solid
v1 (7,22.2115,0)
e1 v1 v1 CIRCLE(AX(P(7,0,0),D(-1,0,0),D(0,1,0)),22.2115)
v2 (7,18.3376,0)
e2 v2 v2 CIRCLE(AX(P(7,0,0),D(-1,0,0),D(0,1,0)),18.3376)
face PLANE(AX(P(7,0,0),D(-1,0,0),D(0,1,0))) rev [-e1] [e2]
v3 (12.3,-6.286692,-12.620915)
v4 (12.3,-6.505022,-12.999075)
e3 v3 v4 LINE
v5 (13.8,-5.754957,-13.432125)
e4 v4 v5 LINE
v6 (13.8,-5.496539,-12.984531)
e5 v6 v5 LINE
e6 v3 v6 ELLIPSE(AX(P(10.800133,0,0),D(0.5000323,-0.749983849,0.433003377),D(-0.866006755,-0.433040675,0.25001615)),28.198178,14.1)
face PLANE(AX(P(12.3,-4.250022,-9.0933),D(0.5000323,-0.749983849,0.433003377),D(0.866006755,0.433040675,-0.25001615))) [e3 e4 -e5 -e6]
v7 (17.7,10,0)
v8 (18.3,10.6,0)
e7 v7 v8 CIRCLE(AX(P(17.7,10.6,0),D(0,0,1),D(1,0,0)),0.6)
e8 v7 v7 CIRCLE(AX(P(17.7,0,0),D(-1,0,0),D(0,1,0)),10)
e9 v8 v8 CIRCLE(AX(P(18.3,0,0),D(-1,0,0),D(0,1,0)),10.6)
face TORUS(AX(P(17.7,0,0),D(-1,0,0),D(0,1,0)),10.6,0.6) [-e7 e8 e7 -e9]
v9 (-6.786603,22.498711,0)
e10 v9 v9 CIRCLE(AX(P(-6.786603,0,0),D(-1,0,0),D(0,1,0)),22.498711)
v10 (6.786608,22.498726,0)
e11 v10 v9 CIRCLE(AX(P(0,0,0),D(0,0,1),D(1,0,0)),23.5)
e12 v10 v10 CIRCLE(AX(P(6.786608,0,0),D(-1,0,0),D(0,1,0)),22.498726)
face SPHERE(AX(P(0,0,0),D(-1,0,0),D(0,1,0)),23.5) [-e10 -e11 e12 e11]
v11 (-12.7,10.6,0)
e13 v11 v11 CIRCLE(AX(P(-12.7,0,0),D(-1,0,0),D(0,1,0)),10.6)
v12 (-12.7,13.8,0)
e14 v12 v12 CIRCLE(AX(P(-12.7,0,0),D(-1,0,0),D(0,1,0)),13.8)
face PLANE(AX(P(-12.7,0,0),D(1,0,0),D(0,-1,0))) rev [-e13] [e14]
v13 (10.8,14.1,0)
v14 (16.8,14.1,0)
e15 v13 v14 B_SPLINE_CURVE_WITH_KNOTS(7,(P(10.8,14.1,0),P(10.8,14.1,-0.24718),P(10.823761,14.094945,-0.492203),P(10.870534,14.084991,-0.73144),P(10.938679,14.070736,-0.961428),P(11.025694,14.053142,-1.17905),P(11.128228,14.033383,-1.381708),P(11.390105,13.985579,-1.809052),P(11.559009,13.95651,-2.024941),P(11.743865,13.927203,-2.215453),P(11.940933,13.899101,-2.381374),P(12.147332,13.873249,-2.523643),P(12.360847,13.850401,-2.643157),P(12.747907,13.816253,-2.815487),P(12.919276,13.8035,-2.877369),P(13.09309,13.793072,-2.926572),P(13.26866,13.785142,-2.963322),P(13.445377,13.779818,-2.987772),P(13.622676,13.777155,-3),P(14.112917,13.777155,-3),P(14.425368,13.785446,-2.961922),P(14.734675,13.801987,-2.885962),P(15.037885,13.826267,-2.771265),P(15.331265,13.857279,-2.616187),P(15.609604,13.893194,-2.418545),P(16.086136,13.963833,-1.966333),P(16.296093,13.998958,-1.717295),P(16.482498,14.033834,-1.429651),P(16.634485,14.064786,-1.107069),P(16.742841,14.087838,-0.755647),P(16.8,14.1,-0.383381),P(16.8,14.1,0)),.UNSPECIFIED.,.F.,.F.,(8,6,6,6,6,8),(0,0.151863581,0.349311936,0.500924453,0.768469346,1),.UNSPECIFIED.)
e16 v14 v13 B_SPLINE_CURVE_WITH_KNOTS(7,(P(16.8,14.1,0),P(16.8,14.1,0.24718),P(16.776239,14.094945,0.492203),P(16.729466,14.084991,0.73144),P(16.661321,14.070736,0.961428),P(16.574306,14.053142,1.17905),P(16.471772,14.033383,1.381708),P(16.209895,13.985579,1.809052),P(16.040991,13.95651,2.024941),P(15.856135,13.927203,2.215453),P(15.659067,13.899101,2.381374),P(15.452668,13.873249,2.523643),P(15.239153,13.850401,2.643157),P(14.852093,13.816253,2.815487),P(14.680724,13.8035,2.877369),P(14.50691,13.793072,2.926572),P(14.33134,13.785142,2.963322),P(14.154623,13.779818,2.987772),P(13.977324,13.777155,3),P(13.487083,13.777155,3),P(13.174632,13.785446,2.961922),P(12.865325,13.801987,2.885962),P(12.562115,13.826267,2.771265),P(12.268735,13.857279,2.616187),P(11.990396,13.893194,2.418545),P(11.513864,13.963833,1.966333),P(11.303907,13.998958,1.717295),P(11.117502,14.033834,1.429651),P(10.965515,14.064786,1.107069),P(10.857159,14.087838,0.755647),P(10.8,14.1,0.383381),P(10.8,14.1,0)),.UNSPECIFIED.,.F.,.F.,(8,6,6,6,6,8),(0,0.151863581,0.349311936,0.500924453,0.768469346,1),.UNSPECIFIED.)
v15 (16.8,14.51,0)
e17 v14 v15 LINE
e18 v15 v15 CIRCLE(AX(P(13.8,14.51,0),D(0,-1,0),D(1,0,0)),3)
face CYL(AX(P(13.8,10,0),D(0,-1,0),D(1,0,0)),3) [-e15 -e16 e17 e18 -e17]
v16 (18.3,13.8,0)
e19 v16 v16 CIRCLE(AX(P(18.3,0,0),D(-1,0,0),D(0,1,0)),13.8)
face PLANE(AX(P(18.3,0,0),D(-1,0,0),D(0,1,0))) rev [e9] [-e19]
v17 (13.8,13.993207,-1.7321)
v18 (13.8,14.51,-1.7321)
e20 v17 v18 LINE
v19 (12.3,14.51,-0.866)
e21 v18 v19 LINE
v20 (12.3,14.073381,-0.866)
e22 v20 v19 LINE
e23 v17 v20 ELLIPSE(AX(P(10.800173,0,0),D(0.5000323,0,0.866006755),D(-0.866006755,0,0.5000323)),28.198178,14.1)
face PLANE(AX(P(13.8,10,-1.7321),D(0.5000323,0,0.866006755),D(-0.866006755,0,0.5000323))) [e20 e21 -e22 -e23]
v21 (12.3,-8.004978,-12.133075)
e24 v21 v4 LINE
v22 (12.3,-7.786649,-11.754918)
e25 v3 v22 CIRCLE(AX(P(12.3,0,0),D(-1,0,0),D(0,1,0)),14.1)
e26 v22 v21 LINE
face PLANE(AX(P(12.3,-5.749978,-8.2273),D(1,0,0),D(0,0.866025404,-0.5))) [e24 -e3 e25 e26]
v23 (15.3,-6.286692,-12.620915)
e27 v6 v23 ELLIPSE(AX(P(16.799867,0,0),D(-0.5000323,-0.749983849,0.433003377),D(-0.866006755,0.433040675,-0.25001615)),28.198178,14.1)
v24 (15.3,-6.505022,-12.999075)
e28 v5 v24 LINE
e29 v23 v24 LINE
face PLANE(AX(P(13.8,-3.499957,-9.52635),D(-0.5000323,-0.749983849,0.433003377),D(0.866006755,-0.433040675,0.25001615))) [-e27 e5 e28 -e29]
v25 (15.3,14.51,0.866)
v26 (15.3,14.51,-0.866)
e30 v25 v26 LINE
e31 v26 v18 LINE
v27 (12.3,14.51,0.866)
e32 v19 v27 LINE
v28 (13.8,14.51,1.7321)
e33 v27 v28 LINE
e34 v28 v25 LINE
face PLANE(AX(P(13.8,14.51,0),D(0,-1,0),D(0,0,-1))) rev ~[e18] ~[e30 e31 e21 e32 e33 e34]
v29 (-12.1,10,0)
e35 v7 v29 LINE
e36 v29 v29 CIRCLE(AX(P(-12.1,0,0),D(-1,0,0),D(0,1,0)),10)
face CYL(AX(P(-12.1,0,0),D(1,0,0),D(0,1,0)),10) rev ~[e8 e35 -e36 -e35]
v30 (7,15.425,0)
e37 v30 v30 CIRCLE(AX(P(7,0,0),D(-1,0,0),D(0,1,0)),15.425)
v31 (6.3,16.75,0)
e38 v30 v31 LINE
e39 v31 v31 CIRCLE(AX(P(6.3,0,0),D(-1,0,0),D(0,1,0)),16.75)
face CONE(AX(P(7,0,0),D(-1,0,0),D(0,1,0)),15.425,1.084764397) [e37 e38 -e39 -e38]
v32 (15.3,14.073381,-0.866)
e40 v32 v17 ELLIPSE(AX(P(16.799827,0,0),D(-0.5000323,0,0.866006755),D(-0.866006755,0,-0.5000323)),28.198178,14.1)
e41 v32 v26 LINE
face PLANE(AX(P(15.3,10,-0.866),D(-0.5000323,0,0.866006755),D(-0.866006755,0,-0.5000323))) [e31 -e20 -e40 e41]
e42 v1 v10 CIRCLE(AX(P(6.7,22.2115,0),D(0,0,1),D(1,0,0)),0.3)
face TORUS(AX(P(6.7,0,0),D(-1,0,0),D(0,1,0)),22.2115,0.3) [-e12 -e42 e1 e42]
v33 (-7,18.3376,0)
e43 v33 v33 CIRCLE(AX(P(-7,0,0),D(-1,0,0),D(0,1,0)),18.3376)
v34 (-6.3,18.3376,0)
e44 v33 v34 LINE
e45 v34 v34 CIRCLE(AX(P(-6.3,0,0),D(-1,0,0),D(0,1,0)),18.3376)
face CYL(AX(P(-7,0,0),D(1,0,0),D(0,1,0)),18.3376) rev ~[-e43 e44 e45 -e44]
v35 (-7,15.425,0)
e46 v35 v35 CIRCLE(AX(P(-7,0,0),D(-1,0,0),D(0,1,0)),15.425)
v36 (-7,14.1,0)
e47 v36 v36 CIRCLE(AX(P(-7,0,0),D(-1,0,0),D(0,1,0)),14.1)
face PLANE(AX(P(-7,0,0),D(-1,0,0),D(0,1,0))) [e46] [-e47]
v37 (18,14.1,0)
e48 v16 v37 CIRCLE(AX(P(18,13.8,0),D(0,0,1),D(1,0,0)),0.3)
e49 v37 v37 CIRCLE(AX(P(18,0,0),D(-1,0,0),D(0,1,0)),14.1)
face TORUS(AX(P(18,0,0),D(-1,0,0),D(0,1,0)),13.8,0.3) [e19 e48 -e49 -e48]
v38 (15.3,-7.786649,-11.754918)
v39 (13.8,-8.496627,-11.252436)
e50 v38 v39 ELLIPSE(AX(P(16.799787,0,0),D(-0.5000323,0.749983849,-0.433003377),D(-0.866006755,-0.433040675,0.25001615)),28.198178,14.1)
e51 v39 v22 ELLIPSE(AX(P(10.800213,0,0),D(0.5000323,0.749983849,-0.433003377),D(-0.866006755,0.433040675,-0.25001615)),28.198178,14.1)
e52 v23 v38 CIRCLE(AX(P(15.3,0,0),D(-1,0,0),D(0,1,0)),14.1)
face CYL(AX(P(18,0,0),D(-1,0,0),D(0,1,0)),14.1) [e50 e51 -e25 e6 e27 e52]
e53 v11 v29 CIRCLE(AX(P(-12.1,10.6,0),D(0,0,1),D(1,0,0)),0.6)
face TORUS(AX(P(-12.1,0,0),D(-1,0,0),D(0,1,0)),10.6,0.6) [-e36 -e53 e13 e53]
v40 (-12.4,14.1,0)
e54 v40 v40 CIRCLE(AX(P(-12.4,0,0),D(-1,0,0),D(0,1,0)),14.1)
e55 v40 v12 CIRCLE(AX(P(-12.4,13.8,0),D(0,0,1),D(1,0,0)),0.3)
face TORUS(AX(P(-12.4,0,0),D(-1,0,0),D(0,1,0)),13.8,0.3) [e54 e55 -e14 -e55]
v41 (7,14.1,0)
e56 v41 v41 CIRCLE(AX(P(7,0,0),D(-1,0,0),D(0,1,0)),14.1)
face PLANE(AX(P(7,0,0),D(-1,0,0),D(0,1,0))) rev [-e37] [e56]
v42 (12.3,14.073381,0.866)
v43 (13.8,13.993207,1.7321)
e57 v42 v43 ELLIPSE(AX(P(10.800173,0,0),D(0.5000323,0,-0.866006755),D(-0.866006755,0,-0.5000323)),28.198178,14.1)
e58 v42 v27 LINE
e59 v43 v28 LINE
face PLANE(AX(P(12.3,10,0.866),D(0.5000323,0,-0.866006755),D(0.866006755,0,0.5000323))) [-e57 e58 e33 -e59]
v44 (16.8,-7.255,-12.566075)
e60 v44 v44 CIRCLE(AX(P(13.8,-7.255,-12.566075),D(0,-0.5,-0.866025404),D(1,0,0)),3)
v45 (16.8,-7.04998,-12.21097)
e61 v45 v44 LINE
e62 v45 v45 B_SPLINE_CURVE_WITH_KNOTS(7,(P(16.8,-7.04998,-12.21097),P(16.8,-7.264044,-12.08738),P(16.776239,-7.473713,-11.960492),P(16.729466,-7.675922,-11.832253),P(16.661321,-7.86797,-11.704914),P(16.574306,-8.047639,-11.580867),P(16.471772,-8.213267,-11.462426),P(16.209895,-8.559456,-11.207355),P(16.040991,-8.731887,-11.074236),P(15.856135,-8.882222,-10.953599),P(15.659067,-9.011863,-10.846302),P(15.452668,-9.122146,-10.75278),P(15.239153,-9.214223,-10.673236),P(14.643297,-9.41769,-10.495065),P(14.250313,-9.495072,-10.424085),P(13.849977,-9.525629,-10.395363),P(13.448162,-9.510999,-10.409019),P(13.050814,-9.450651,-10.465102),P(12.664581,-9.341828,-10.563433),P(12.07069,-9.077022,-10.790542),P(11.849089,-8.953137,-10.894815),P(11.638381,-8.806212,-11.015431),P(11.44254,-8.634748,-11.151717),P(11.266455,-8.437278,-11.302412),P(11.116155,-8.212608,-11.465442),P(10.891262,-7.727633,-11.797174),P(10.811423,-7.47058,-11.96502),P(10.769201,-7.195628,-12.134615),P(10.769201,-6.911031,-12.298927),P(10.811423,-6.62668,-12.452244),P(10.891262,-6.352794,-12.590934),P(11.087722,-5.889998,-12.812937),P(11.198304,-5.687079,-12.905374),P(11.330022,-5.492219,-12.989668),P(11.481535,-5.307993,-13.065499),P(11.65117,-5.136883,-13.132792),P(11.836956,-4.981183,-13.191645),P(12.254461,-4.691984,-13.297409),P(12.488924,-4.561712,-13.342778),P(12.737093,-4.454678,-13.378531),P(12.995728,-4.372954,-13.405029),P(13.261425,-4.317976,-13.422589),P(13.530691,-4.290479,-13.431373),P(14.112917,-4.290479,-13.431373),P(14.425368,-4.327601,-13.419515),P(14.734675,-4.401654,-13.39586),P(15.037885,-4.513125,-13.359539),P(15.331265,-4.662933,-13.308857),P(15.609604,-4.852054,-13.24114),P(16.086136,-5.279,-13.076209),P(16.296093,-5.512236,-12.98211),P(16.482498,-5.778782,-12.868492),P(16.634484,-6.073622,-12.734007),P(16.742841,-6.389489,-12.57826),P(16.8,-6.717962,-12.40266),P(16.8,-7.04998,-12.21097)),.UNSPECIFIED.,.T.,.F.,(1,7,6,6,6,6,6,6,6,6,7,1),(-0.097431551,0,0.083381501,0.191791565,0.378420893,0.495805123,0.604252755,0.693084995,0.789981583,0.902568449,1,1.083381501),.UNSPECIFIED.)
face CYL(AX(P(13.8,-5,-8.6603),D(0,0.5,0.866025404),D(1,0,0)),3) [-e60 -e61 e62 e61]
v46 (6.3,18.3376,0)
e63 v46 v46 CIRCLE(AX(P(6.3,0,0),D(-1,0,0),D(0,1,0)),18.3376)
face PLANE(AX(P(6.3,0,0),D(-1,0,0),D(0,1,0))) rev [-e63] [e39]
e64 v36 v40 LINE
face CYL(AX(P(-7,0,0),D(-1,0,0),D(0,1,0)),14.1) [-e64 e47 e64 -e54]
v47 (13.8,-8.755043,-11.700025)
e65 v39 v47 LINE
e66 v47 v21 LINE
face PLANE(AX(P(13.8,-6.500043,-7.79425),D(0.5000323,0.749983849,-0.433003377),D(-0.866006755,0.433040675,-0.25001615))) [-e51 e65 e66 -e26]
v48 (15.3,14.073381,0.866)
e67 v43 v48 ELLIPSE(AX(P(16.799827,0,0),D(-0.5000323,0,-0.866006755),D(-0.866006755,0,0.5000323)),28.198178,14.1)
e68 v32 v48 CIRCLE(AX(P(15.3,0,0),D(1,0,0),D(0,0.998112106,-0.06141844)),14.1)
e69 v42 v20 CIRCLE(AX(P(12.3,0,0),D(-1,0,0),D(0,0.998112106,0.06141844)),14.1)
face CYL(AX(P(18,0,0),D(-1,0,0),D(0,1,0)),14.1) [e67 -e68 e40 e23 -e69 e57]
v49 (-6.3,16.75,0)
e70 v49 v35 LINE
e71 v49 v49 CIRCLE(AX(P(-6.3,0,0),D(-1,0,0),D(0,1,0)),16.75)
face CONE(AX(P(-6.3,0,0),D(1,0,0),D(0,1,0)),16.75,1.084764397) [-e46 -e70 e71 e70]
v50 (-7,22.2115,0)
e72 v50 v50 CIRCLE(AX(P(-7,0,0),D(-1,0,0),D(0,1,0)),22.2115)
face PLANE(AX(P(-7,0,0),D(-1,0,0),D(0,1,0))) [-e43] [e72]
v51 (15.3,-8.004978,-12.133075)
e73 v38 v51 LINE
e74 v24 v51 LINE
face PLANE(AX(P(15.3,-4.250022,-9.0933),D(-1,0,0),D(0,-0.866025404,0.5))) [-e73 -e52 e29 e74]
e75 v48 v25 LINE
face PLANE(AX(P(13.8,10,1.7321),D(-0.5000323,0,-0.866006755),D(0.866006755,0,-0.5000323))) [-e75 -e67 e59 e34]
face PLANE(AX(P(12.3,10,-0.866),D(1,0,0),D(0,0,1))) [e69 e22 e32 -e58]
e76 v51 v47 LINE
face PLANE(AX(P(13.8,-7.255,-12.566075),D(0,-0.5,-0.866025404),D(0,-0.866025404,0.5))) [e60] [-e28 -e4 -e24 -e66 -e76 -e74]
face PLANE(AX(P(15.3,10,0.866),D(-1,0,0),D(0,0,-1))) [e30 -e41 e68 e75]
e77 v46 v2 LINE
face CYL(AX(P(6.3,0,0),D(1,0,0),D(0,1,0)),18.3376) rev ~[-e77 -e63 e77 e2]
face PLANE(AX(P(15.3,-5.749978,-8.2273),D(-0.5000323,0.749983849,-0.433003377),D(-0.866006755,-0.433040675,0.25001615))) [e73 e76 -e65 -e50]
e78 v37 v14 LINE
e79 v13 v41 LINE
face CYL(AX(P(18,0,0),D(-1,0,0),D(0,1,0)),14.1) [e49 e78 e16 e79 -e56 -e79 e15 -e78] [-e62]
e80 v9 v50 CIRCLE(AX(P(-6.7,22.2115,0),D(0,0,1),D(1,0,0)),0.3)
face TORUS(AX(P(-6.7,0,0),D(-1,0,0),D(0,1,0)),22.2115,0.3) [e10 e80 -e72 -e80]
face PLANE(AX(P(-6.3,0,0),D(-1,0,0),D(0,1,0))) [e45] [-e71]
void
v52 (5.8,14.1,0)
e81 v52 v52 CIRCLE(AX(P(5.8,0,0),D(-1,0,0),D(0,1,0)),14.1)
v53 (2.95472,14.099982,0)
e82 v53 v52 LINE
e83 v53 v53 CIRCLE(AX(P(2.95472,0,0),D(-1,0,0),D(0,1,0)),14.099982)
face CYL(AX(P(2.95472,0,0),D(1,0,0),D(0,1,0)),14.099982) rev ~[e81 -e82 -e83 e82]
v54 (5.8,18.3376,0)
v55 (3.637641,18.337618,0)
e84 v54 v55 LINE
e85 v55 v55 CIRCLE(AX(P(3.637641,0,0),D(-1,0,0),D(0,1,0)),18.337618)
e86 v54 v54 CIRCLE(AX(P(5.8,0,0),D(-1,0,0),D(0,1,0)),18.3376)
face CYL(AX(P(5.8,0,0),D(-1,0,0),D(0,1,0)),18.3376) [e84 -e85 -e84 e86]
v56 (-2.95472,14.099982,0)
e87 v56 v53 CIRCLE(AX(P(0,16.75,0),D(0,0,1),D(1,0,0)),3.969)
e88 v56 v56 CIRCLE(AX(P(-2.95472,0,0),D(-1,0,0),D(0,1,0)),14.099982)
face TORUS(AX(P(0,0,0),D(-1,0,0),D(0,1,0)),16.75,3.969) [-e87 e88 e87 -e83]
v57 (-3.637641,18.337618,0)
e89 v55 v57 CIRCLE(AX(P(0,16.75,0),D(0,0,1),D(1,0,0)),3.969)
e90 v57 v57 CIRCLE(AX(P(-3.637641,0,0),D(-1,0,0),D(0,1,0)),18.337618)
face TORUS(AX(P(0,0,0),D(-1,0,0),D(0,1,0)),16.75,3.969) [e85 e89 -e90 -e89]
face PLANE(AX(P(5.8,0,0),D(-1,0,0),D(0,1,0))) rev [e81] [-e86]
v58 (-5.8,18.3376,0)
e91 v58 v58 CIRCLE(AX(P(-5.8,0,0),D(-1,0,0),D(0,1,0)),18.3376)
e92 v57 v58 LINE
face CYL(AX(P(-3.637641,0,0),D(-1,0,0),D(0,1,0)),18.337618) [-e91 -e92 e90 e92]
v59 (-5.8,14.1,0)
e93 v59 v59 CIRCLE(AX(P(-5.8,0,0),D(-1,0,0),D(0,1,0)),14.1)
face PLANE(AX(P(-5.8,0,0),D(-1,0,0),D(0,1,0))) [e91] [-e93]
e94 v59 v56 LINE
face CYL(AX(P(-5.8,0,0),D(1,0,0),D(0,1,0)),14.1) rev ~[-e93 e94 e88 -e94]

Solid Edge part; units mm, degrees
sketch "Sketch1" plane through (0, 10, 0) normal (0, -1, 0) x (1, 0, 0)
  circle A0 centre (13.8, 0) radius 3
  line L0 (12.3, -0.866) -> (12.3, 0.866)
  line L1 (12.3, 0.866) -> (13.8, 1.7321)
  line L2 (13.8, 1.7321) -> (15.3, 0.866)
  line L3 (15.3, 0.866) -> (15.3, -0.866)
  line L4 (15.3, -0.866) -> (13.8, -1.7321)
  line L5 (13.8, -1.7321) -> (12.3, -0.866)
extrude "ExtrudedProtrusion_1" add sketch "Sketch1" against normal blind 4.51
sketch "Sketch2" plane through (0, 0, 0) normal (0, 0, 1) x (1, 0, 0)
  arc A0 (-12.7, 10.6) -> (-12.1, 10) centre (-12.1, 10.6) ccw
  line L0 (-12.1, 10) -> (17.7, 10)
  arc A1 (17.7, 10) -> (18.3, 10.6) centre (17.7, 10.6) ccw
  line L1 (18.3, 10.6) -> (18.3, 13.8)
  arc A2 (18.3, 13.8) -> (18, 14.1) centre (18, 13.8) ccw
  line L2 (18, 14.1) -> (7, 14.1)
  line L3 (7, 14.1) -> (7, 15.425)
  line L4 (7, 15.425) -> (6.3, 16.75)
  line L5 (6.3, 16.75) -> (6.3, 18.3376)
  line L6 (6.3, 18.3376) -> (7, 18.3376)
  line L7 (7, 18.3376) -> (7, 22.2115)
  arc A3 (7, 22.2115) -> (6.7866, 22.4987) centre (6.7, 22.2115) ccw
  arc A4 (6.7866, 22.4987) -> (-6.7866, 22.4987) centre (0, 0) ccw
  arc A5 (-6.7866, 22.4987) -> (-7, 22.2115) centre (-6.7, 22.2115) ccw
  line L8 (-7, 22.2115) -> (-7, 18.3376)
  line L9 (-7, 18.3376) -> (-6.3, 18.3376)
  line L10 (-6.3, 18.3376) -> (-6.3, 16.75)
  line L11 (-6.3, 16.75) -> (-7, 15.425)
  line L12 (-7, 15.425) -> (-7, 14.1)
  line L13 (-7, 14.1) -> (-12.4, 14.1)
  arc A6 (-12.4, 14.1) -> (-12.7, 13.8) centre (-12.4, 13.8) ccw
  line L14 (-12.7, 13.8) -> (-12.7, 10.6)
  line L15 (-5.8, 14.1) -> (-2.9547, 14.1)
  arc A7 (-2.9547, 14.1) -> (2.9547, 14.1) centre (0, 16.75) ccw
  line L16 (2.9547, 14.1) -> (5.8, 14.1)
  line L17 (5.8, 14.1) -> (5.8, 18.3376)
  line L18 (5.8, 18.3376) -> (3.6376, 18.3376)
  arc A8 (3.6376, 18.3376) -> (-3.6376, 18.3376) centre (0, 16.75) ccw
  line L19 (-3.6376, 18.3376) -> (-5.8, 18.3376)
  line L20 (-5.8, 18.3376) -> (-5.8, 14.1)
revolve "RevolvedProtrusion1" add sketch "Sketch2" angle 360 about axis through (50, 0, 0) along (-1, 0, 0)
sketch "Sketch3" plane through (0, -5, -8.6603) normal (0, -0.5, -0.8660254) x (1, 0, 0)
  circle A0 centre (13.8, 0) radius 3
  line L0 (12.3, 0.866) -> (12.3, -0.866)
  line L1 (12.3, -0.866) -> (13.8, -1.7321)
  line L2 (13.8, -1.7321) -> (15.3, -0.866)
  line L3 (15.3, -0.866) -> (15.3, 0.866)
  line L4 (15.3, 0.866) -> (13.8, 1.7321)
  line L5 (13.8, 1.7321) -> (12.3, 0.866)
extrude "ExtrudedProtrusion_2" add sketch "Sketch3" along normal blind 4.51
properties material "Stainless steel"
